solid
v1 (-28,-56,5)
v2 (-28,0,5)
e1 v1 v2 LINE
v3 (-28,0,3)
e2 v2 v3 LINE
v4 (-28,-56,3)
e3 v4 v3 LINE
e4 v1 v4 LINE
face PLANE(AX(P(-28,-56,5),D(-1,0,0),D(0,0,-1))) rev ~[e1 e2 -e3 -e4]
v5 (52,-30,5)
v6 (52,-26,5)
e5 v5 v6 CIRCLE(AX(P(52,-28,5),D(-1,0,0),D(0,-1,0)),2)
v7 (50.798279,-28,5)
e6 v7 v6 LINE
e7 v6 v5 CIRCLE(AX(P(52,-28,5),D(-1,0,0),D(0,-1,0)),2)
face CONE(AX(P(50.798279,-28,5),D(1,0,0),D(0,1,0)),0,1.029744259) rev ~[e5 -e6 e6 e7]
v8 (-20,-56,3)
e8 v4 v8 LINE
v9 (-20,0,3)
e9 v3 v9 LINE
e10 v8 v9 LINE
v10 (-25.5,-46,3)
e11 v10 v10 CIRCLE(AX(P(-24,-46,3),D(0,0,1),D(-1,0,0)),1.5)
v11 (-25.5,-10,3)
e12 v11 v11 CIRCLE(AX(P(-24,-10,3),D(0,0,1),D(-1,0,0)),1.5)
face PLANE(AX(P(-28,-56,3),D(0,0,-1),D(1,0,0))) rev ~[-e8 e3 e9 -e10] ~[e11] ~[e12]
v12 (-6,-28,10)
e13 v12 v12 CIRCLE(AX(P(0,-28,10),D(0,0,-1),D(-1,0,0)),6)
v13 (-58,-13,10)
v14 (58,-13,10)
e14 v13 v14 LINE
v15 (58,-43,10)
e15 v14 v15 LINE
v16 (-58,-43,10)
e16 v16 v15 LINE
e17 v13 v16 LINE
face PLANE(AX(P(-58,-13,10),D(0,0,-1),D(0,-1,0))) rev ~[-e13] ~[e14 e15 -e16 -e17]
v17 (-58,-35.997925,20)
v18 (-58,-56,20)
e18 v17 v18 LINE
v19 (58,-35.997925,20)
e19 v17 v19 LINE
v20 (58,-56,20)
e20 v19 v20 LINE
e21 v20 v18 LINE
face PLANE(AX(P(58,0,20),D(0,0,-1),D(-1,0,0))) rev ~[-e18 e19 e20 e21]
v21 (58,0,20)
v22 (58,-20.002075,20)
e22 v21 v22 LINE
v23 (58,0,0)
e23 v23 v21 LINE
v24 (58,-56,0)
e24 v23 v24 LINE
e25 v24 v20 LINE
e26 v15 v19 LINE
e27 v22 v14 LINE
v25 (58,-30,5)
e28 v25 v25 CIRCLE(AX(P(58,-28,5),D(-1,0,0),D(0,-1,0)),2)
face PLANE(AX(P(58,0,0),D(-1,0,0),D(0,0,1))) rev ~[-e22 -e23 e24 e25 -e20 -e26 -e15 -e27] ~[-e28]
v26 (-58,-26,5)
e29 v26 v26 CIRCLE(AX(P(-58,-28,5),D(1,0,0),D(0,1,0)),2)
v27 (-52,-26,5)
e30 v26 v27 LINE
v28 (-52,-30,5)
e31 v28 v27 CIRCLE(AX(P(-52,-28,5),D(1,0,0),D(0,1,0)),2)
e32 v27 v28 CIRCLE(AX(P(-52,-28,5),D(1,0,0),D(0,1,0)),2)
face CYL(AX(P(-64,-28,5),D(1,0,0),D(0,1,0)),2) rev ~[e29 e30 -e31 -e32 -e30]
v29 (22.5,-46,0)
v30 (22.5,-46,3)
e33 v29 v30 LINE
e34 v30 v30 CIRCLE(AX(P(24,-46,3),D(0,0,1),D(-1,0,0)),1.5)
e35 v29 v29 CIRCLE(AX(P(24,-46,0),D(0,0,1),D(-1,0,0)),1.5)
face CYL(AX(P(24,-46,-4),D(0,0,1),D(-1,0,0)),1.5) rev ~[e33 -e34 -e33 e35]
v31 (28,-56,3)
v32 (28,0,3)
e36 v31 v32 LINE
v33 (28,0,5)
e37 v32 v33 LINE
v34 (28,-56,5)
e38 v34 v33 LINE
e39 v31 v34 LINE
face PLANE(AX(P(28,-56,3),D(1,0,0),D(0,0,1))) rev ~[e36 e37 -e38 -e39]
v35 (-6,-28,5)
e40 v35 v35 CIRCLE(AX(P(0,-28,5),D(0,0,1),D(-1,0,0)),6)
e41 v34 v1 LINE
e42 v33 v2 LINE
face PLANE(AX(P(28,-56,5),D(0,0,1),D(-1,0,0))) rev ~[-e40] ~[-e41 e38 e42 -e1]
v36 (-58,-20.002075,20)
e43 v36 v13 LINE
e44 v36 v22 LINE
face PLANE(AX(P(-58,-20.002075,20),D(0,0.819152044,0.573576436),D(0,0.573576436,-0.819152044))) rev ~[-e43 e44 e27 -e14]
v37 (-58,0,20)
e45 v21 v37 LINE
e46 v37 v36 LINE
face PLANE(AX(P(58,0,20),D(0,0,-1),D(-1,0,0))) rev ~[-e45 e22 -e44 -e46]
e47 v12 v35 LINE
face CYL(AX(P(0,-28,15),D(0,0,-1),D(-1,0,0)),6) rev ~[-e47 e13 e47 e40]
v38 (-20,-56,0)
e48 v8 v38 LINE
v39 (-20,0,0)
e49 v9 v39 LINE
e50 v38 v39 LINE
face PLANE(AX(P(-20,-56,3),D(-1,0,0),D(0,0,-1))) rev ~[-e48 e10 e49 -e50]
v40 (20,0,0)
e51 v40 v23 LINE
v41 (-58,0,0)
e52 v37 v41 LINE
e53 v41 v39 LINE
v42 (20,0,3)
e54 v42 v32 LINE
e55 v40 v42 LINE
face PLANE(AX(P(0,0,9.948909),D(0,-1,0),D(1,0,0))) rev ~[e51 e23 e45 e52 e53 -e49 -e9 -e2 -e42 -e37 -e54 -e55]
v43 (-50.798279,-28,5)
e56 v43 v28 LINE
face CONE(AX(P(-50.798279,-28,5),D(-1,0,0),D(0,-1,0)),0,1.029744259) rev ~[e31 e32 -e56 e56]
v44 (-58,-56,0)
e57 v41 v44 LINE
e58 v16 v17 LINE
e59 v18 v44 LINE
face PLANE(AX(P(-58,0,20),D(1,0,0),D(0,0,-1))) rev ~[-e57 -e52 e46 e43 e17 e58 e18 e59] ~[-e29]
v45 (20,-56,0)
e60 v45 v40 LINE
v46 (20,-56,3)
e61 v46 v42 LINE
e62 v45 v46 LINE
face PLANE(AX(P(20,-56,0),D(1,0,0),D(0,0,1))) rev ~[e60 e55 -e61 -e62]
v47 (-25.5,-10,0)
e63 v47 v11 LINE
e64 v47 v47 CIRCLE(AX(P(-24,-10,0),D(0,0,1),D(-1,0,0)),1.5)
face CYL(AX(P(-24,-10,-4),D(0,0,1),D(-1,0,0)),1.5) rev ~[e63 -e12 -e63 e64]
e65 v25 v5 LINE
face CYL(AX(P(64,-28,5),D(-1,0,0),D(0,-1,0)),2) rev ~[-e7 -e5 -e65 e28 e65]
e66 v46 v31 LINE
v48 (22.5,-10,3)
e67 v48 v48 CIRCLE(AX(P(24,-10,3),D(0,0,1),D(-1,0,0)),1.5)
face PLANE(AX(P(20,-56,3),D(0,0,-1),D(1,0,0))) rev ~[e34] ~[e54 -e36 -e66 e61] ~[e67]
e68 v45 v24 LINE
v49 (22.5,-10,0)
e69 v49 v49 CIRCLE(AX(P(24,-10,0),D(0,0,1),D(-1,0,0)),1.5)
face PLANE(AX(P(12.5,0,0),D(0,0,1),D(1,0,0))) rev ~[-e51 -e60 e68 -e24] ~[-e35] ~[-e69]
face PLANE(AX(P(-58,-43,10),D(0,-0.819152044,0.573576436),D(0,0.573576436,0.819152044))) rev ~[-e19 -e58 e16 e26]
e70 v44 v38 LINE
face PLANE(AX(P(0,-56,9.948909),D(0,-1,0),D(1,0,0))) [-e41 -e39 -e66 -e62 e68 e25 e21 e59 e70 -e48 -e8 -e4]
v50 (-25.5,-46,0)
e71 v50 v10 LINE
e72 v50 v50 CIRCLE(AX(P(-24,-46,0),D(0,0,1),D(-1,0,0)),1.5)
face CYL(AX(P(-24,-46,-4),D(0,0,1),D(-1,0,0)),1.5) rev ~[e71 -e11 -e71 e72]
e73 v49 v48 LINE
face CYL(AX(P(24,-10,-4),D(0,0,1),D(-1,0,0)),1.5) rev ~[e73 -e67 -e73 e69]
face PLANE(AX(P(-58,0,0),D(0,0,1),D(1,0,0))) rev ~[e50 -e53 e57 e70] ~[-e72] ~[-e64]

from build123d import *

# Parameters (mm, degrees)
F1_DEPTH  = 56
F3_DEPTH  = 116
F5_D      = 12
F5_DEPTH  = 5
F5_TIP    = 3.6051637142
F7_D      = 4
F7_DEPTH  = 6
F7_TIP    = 1.2017212381
F9_D      = 4
F9_DEPTH  = 6
F9_TIP    = 1.2017212381
F11_DEPTH = 56.001
F13_D     = 3
F13_DEPTH = 4
F13_TIP   = 0.9012909285


# Not quite as in the source:
# - a feature names something its author has since deleted; it is built from what else it names


with BuildPart() as f1:
    # F0 (on Front) → F1 (new body)
    with BuildSketch(Plane.XZ):
        Polygon((1.5, 0), (2, 2), (12, 2), (12.5, 0), (58, 0), (58, 20), (-58, 20), (-58, 0), (-12.5, 0), (-12, 2), (-2, 2), (-1.5, 0), (0, 0), align=None)
    extrude(amount=F1_DEPTH)

    # F2 (on face) → F3 (cut, through all)
    with BuildSketch(Plane(origin=(-58, 0, 0), x_dir=(0, -1, 0), z_dir=(-1, 0, 0))):
        Polygon((28, 20), (20.0020753821, 20), (13, 10), (28, 10), align=None)
        Polygon((35.9979246179, 20), (28, 20), (28, 10), (43, 10), align=None)
    extrude(amount=-F3_DEPTH, mode=Mode.SUBTRACT)

    # F5
    with Locations(Plane.XY.offset(10)):
        with Locations((0, -28)):
            Hole(F5_D / 2, depth=F5_DEPTH)
            with Locations((0, 0, -(F5_DEPTH + F5_TIP / 2))):  # 118° drill point
                Cone(0, F5_D / 2, F5_TIP, mode=Mode.SUBTRACT)

    # F7
    with Locations(Plane(origin=(-58, 0, 0), x_dir=(0, -1, 0), z_dir=(-1, 0, 0))):
        with Locations((28, 5)):
            Hole(F7_D / 2, depth=F7_DEPTH)
            with Locations((0, 0, -(F7_DEPTH + F7_TIP / 2))):  # 118° drill point
                Cone(0, F7_D / 2, F7_TIP, mode=Mode.SUBTRACT)

    # F9
    with Locations(Plane.YZ.offset(58)):
        with Locations((-28, 5)):
            Hole(F9_D / 2, depth=F9_DEPTH)
            with Locations((0, 0, -(F9_DEPTH + F9_TIP / 2))):  # 118° drill point
                Cone(0, F9_D / 2, F9_TIP, mode=Mode.SUBTRACT)

    # F10 (on face) → F11 (cut, through all)
    with BuildSketch(Plane.XZ.offset(56)):
        Polygon((12.5, 0), (20, 0), (20, 3), (28, 3), (28, 5), (20, 5), (0, 5), (0, 0), (1.5, 0), (2, 2), (12, 2), align=None)
        Polygon((-1.5, 0), (0, 0), (0, 5), (-20, 5), (-28, 5), (-28, 3), (-20, 3), (-20, 0), (-12.5, 0), (-12, 2), (-2, 2), align=None)
    extrude(amount=-F11_DEPTH, mode=Mode.SUBTRACT)

    # F13
    with Locations(Plane(origin=(0, 0, 0), x_dir=(1, 0, 0), z_dir=(0, 0, -1))):
        with Locations((-24, 46), (24, 46), (24, 10), (-24, 10)):
            Hole(F13_D / 2, depth=F13_DEPTH)
            with Locations((0, 0, -(F13_DEPTH + F13_TIP / 2))):  # 118° drill point
                Cone(0, F13_D / 2, F13_TIP, mode=Mode.SUBTRACT)


solid = f1.part
